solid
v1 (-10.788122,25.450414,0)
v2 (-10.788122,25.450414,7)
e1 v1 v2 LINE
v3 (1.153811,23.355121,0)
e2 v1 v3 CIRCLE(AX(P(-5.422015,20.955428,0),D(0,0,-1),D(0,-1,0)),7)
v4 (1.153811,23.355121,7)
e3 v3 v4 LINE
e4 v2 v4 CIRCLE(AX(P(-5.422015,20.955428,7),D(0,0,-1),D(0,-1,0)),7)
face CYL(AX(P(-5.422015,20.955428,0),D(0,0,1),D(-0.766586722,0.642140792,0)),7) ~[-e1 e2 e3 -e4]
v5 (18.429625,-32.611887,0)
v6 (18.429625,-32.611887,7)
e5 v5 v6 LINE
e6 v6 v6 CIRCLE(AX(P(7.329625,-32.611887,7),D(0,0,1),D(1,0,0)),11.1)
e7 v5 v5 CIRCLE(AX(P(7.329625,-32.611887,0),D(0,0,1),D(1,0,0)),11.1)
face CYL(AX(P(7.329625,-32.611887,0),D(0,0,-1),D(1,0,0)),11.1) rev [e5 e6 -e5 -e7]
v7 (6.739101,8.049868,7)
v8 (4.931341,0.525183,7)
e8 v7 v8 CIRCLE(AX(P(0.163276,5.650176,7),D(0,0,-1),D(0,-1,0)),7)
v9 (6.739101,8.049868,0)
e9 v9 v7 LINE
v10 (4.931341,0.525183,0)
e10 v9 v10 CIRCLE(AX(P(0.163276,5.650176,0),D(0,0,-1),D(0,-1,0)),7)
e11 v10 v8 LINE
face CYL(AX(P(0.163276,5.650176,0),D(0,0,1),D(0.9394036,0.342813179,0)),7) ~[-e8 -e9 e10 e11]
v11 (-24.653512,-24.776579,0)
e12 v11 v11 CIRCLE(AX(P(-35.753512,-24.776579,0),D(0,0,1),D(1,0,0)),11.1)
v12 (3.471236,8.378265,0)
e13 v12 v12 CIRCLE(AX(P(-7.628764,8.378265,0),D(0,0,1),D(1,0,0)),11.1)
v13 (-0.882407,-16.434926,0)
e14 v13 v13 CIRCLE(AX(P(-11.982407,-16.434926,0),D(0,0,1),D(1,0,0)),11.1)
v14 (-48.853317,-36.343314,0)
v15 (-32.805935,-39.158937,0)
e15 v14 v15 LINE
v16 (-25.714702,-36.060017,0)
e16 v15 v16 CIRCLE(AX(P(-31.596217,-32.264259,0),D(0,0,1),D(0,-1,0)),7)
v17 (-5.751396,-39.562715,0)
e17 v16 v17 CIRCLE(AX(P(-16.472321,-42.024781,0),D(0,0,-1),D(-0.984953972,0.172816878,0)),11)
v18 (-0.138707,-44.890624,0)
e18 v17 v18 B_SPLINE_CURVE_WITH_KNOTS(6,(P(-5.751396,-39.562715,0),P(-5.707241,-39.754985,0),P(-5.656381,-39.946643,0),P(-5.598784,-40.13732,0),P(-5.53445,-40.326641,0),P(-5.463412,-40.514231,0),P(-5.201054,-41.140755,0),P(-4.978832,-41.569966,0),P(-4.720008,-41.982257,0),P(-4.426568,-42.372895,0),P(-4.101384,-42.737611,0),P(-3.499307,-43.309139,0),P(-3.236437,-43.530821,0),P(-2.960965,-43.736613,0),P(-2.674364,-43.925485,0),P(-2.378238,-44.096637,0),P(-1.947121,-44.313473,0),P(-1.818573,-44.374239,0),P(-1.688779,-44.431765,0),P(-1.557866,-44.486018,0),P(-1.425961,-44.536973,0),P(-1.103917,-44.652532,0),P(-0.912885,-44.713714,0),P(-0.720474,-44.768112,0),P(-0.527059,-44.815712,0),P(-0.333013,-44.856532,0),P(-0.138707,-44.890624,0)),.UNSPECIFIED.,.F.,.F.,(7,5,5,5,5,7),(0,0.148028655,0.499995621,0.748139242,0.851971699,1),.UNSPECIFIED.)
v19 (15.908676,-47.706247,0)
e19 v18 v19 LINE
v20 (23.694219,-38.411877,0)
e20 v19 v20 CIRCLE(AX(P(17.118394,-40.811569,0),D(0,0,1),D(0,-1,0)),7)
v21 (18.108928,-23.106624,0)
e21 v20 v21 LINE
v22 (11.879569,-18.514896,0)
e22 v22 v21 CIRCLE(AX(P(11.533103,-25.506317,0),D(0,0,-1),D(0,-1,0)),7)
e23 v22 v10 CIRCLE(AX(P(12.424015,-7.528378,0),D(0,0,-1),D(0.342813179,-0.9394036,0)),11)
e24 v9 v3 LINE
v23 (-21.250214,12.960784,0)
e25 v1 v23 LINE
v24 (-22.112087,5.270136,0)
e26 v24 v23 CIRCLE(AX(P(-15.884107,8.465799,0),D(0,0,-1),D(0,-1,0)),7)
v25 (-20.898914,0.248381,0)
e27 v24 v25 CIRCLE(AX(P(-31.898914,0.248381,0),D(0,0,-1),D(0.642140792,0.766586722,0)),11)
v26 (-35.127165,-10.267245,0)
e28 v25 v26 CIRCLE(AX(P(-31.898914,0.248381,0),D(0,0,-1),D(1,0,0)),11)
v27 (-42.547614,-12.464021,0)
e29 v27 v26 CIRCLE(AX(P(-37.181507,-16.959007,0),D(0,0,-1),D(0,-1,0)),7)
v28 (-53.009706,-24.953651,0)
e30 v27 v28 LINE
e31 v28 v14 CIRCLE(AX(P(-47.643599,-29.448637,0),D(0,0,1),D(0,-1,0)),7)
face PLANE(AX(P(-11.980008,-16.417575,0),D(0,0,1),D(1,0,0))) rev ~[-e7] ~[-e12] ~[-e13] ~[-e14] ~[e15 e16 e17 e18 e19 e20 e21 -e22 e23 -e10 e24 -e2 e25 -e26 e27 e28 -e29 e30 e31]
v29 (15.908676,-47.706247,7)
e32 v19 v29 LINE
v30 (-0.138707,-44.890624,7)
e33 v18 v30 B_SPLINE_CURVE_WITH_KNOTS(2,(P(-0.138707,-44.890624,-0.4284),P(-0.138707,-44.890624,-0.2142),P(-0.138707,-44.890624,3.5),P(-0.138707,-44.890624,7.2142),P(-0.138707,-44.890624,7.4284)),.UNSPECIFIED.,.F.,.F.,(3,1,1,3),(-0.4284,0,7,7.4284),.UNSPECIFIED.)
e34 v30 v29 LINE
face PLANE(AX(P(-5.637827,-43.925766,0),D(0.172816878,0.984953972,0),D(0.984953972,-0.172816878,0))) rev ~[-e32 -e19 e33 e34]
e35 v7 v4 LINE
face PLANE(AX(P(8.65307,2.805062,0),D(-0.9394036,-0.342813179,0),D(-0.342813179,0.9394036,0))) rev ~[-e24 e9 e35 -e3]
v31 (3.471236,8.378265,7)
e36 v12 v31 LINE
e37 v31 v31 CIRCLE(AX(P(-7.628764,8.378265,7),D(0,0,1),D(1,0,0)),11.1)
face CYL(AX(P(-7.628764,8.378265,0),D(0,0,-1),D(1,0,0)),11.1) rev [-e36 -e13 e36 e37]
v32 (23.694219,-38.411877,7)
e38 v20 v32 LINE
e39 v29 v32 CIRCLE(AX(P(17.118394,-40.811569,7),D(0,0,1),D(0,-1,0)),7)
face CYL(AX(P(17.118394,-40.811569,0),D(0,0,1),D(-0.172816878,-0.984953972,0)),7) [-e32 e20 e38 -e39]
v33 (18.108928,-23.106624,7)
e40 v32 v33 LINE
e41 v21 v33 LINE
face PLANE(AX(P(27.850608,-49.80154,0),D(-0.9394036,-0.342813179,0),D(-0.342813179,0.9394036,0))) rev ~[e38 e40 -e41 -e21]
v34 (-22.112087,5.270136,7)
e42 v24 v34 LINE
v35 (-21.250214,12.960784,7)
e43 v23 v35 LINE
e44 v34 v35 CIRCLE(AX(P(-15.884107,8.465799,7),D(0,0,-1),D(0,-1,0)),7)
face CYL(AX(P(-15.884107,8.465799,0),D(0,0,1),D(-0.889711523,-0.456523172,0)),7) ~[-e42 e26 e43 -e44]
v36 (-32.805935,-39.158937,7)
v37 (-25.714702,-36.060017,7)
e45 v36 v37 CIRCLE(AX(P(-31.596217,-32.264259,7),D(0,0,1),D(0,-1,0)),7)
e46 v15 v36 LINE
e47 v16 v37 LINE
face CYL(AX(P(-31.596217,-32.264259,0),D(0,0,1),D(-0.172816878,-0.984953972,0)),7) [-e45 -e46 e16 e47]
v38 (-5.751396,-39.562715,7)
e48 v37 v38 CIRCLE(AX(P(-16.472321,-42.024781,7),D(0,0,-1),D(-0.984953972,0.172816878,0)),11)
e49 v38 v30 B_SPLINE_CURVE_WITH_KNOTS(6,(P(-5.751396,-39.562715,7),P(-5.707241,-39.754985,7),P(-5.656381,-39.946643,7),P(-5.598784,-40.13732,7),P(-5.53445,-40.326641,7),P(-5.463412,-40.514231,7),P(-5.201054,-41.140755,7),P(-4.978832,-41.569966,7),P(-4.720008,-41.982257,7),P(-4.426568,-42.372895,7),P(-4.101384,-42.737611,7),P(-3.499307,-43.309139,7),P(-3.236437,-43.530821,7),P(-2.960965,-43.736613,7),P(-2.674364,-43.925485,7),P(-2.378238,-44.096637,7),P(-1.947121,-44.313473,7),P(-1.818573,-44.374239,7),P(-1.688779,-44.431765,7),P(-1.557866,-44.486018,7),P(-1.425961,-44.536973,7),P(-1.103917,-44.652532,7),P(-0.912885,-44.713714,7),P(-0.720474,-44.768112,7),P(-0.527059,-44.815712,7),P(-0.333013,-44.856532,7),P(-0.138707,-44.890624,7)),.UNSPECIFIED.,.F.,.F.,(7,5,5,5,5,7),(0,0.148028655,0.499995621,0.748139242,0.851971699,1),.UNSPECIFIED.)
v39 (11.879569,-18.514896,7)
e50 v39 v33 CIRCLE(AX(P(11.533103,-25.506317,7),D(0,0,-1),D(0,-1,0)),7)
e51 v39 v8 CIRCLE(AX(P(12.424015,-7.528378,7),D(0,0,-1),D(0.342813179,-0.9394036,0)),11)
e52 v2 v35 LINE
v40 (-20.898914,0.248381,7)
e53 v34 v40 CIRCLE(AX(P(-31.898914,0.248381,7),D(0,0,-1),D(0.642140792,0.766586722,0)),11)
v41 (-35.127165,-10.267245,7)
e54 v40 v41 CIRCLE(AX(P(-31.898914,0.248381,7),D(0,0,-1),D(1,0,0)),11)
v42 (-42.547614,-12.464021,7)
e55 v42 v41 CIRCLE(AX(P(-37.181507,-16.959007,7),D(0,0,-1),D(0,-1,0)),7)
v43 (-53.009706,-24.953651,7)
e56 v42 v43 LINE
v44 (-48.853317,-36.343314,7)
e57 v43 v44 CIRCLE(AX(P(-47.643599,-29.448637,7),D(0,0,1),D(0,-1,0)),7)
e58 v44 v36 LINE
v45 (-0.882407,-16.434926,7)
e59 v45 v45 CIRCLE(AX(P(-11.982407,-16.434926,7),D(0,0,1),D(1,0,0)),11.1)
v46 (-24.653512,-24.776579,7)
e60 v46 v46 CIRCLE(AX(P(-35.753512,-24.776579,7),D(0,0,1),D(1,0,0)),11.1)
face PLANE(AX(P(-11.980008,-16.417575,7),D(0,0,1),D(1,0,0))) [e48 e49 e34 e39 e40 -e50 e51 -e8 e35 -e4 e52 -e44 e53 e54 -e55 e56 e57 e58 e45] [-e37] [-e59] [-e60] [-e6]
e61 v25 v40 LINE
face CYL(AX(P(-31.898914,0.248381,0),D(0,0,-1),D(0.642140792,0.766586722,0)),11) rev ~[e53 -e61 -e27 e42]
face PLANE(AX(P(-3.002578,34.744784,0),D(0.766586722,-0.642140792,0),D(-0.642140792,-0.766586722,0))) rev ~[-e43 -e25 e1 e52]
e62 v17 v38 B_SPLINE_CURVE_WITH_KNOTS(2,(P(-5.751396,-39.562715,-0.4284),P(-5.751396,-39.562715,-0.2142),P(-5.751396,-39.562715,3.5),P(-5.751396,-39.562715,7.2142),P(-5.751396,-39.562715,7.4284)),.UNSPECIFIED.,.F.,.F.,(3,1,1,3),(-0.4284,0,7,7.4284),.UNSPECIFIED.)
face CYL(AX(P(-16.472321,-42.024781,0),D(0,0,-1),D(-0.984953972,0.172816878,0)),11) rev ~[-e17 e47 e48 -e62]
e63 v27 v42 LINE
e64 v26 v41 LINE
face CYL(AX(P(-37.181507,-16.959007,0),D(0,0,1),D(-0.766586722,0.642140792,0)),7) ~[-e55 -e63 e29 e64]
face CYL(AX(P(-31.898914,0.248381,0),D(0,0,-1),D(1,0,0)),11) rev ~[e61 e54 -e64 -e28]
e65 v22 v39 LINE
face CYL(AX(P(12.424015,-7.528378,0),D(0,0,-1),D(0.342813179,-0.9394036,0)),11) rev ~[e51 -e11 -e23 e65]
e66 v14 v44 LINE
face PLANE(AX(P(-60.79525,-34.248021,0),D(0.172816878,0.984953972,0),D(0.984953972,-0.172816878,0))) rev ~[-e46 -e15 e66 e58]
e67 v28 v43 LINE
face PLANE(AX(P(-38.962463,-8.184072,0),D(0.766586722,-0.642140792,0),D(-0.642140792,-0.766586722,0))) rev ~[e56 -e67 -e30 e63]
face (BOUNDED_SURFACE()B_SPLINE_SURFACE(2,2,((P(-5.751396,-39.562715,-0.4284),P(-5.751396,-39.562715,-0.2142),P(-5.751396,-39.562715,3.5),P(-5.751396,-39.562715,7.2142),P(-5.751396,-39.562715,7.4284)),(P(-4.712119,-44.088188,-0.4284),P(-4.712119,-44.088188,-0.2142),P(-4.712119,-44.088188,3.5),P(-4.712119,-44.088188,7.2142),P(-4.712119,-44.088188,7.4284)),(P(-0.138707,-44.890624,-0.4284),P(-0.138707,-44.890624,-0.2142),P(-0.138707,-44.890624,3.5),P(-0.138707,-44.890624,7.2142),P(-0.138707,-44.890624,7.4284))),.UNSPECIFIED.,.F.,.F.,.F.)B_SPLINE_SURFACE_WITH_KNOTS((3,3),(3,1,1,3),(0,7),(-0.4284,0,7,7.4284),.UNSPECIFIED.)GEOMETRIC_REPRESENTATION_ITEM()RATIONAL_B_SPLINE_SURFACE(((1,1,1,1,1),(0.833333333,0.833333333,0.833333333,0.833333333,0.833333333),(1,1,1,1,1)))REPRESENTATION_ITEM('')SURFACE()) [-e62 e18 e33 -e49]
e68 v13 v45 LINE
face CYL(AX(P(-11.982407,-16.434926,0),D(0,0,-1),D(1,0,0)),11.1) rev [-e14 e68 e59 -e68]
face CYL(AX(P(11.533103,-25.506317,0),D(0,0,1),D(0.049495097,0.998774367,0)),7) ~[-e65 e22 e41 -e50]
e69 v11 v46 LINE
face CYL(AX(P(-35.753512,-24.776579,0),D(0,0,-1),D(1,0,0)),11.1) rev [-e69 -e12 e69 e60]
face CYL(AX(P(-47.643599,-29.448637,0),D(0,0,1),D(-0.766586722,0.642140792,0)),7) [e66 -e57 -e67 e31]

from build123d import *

# Parameters (mm, degrees)
F0_R     = 11.1
F1_DEPTH = 7
F2_R     = 7


with BuildPart() as f1:
    # F0 (on Top) → F1 (new body)
    with BuildSketch(Plane.XY):
        with BuildLine():
            Line((-38.9624627261, -8.1840724655), (-60.7952496686, -34.2480210213))
            Line((-60.7952496686, -34.2480210213), (-27.306814625, -40.123794871))
            ThreePointArc((-27.306814625, -40.123794871), (-15.5182325204, -31.0662352189), (-5.4723209344, -42.0247805283))
            ThreePointArc((-5.4723209344, -42.0247805283), (-5.5137756251, -42.9788689424), (-5.6378272439, -43.9257661855))
            Line((-5.6378272439, -43.9257661855), (27.8506077997, -49.8015400352))
            Line((27.8506077997, -49.8015400352), (16.1949596986, -17.8618176297))
            ThreePointArc((16.1949596986, -17.8618176297), (2.090575123, -11.2993230017), (8.6530697509, 2.8050615739))
            Line((8.6530697509, 2.8050615739), (-3.0025783502, 34.7447839795))
            Line((-3.0025783502, 34.7447839795), (-24.8353652927, 8.6808354236))
            ThreePointArc((-24.8353652927, 8.6808354236), (-21.9314911759, 4.9013893297), (-20.8989140094, 0.2483814791))
            ThreePointArc((-20.8989140094, 0.2483814791), (-27.2459061587, -9.7190413544), (-38.9624627261, -8.1840724655))
        make_face()
        with Locations((-35.7535122499, -24.7765792781)):
            Circle(F0_R, mode=Mode.SUBTRACT)
        with Locations((7.3296251626, -32.6118866408)):
            Circle(F0_R, mode=Mode.SUBTRACT)
        with Locations((-11.9824067397, -16.4349256924)):
            Circle(F0_R, mode=Mode.SUBTRACT)
        with Locations((-7.6287635535, 8.378265008)):
            Circle(F0_R, mode=Mode.SUBTRACT)
    extrude(amount=F1_DEPTH)

    # F2
    f2_edges = [f1.edges().sort_by_distance(p)[0] for p in [
        (-3.002578, 34.744784, 3.5),
        (-24.835365, 8.680835, 3.5),
        (-38.962463, -8.184072, 3.5),
        (-60.79525, -34.248021, 3.5),
        (-27.306815, -40.123795, 3.5),
        (-5.637827, -43.925766, 3.5),
        (16.19496, -17.861818, 3.5),
        (8.65307, 2.805062, 3.5),
        (27.850608, -49.80154, 3.5),
    ]]
    fillet(f2_edges, radius=F2_R)


solid = f1.part
